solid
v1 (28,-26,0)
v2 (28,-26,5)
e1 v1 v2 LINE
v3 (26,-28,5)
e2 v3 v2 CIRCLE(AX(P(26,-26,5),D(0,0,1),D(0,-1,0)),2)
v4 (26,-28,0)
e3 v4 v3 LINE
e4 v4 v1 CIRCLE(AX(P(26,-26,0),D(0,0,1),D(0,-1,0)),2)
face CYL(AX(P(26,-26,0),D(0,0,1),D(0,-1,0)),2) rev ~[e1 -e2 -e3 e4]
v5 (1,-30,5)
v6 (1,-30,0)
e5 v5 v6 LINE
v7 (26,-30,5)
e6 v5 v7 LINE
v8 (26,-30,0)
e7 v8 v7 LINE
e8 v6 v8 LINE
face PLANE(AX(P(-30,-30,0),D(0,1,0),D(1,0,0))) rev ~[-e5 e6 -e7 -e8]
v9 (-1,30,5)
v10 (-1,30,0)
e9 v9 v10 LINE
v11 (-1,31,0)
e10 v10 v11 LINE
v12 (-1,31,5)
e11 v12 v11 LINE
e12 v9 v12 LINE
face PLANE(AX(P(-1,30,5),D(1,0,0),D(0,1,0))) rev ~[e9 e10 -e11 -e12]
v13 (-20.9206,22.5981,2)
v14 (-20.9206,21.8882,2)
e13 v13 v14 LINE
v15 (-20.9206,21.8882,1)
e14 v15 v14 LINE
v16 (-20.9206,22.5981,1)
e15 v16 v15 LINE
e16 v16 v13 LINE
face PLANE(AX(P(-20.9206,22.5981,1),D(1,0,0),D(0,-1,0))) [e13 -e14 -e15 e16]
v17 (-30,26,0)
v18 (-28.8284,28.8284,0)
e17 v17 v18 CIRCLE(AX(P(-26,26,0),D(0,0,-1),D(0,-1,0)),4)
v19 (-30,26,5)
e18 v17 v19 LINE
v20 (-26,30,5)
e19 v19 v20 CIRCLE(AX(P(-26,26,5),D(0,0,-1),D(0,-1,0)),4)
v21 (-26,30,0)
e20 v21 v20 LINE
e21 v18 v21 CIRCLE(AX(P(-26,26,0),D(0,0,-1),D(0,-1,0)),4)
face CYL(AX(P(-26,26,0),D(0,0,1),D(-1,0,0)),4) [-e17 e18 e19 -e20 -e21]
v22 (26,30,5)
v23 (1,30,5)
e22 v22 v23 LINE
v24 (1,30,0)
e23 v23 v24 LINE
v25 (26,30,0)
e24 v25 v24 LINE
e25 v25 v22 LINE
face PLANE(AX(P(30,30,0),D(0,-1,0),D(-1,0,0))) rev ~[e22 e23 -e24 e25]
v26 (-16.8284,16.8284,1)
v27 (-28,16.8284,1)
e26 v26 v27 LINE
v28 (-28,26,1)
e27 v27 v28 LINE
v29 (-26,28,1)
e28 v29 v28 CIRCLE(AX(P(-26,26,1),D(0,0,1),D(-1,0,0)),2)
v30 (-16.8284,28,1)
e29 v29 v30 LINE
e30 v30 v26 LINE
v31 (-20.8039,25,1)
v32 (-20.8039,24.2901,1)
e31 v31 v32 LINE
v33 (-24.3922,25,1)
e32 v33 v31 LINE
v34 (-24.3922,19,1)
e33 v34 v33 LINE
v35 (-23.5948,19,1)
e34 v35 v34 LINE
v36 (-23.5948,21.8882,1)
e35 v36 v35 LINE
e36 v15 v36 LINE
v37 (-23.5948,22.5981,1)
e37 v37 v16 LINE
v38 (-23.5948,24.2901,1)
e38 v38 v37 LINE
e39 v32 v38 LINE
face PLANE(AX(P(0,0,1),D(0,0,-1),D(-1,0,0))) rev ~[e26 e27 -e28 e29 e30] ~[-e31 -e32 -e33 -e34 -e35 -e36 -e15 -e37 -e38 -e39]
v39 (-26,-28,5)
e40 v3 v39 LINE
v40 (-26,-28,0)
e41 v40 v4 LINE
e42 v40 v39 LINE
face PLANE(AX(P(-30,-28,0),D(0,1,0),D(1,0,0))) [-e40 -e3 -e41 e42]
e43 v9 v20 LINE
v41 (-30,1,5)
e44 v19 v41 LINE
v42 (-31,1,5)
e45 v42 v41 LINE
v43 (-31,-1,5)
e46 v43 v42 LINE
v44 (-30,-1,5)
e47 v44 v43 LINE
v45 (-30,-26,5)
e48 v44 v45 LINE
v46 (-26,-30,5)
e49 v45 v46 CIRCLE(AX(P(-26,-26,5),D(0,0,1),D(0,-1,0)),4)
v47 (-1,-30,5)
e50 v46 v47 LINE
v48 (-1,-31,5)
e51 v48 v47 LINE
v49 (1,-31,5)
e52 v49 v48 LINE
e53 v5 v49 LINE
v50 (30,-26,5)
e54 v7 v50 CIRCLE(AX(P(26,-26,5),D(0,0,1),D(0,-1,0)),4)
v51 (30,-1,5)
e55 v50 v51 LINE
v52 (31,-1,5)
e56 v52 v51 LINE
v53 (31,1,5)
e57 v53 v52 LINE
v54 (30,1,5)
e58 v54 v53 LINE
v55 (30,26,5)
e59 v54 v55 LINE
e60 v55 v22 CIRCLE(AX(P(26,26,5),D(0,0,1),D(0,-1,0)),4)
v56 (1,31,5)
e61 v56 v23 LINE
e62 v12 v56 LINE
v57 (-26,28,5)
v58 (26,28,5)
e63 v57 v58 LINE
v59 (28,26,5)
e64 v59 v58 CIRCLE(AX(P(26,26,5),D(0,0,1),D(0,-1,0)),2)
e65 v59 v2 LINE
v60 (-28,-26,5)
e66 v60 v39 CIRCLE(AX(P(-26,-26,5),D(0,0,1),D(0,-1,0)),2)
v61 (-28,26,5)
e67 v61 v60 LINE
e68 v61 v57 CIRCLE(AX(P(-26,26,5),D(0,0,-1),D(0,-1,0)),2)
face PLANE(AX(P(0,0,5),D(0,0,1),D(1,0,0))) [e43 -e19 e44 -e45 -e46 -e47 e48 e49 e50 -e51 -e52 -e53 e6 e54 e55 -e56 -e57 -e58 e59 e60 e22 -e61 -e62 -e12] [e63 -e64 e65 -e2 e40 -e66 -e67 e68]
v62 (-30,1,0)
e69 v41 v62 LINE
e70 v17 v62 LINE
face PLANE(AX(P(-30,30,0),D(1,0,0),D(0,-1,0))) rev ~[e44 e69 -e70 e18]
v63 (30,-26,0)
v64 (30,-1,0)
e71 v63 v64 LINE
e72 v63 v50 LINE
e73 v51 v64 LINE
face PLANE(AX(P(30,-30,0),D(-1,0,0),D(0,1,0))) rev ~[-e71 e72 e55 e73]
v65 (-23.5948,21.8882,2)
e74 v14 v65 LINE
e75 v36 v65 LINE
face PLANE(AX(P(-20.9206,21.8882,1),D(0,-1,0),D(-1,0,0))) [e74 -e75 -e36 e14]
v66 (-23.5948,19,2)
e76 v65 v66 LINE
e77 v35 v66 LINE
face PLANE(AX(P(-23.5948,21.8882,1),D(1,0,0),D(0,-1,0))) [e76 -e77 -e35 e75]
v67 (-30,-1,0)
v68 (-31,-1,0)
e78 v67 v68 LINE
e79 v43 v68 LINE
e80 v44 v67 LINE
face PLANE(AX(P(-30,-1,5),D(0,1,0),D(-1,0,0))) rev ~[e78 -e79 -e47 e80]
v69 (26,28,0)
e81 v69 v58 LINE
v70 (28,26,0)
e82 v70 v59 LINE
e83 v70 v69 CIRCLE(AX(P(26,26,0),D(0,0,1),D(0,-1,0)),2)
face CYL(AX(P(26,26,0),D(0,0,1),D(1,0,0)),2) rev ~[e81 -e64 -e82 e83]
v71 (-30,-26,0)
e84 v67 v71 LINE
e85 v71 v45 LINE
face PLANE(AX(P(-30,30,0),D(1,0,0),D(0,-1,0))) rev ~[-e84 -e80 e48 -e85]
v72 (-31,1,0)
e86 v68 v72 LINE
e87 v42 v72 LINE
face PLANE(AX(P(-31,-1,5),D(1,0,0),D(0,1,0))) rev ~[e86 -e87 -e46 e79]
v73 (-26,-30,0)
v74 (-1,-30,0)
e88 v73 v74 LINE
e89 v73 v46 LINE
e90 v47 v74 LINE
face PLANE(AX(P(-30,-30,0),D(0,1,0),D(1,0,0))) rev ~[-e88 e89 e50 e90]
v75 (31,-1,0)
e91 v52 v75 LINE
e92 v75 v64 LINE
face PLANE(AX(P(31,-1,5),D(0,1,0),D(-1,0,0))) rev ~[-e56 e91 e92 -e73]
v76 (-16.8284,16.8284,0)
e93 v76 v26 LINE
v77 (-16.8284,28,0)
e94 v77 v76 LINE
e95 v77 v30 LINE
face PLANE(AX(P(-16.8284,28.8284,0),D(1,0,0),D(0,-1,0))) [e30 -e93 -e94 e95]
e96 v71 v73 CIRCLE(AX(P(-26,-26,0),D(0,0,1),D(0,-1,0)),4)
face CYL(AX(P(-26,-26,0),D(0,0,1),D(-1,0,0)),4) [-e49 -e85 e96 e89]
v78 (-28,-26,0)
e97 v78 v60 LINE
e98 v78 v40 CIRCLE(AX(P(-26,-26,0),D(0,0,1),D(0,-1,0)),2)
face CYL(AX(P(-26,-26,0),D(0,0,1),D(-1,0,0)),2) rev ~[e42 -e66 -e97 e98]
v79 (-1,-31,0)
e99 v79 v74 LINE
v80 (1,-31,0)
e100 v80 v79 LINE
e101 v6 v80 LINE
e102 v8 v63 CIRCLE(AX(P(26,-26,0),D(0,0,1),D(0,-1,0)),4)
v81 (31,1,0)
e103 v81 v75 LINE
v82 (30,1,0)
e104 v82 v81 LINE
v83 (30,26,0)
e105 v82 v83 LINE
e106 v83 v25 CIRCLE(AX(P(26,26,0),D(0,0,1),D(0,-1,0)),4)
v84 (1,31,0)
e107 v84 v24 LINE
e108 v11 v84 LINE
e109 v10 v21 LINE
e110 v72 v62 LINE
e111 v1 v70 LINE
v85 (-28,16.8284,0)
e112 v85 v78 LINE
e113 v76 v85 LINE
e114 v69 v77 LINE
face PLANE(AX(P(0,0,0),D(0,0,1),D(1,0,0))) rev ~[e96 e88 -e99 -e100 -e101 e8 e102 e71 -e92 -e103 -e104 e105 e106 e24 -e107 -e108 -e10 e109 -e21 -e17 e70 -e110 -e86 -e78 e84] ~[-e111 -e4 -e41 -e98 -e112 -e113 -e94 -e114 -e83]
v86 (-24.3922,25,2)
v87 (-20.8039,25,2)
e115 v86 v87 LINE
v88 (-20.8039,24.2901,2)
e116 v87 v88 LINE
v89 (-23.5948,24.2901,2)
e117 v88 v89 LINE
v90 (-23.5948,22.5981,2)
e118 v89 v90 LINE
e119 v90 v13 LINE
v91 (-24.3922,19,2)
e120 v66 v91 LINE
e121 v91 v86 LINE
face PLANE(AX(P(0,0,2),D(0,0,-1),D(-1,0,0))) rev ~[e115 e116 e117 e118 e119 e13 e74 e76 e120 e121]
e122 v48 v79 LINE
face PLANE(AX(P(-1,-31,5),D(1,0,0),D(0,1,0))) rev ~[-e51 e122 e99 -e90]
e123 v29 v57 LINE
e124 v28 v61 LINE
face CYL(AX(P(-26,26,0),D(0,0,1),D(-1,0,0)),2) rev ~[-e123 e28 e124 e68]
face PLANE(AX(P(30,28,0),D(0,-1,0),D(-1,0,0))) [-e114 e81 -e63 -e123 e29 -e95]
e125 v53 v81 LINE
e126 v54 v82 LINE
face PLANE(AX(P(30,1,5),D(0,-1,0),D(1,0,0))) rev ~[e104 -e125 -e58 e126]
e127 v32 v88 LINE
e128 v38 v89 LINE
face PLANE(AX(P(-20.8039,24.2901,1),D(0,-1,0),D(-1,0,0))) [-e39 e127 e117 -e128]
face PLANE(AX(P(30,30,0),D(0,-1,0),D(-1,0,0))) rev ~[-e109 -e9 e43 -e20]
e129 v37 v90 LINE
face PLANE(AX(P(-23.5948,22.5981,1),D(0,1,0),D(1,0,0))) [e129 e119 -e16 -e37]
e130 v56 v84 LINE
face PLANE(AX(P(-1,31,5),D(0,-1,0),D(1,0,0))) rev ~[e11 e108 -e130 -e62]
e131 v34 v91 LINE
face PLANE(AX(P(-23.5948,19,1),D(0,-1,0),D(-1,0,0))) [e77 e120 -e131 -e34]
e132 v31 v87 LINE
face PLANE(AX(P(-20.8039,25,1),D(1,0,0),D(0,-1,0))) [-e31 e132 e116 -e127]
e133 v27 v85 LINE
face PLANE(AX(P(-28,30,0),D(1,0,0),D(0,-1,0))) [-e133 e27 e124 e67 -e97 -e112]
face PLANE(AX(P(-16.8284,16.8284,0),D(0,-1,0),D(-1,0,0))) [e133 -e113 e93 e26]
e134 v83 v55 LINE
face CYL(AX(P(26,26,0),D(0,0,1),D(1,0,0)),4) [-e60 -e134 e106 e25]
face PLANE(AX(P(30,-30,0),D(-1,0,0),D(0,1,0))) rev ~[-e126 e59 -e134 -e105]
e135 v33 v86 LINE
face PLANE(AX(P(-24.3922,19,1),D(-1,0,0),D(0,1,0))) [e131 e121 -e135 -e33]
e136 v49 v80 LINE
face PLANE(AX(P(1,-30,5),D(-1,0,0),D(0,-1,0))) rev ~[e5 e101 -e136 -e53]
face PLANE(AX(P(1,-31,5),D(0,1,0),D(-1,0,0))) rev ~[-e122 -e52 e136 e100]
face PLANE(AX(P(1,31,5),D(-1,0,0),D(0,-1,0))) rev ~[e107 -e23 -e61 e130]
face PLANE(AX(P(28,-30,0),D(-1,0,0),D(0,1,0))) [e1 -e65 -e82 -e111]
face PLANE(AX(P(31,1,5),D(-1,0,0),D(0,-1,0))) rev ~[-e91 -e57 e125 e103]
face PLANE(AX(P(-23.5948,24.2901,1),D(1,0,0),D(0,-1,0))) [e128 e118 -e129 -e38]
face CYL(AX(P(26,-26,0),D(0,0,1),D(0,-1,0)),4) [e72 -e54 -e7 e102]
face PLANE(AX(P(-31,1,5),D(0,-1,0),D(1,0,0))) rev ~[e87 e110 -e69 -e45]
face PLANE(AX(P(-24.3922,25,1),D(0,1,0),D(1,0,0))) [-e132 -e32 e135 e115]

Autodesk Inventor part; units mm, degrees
ref_plane "YZ Plane" through (0, 0, 0) normal (1, 0, 0) x (0, 1, 0)
ref_plane "XZ Plane" through (0, 0, 0) normal (0, 1, 0) x (-1, 0, 0)
ref_plane "XY Plane" through (0, 0, 0) normal (0, 0, 1) x (1, 0, 0)
sketch "Sketch1" plane through (0, 0, 0) normal (0, 0, 1) x (1, 0, 0)
  line L0 (-30, -30) -> (30, -30)
  line L1 (30, -30) -> (30, 30)
  line L2 (30, 30) -> (-30, 30)
  line L3 (-30, 30) -> (-30, -30)
  point P0 (0, 0)
  point P1 (-30, 0)
  point P2 (0, 30)
  dimension "d0" = 60
extrude "Extrusion1" add sketch "Sketch1" along normal blind 5
sketch "Sketch2" plane through (0, 0, 5) normal (0, 0, 1) x (1, 0, 0)
  line L0 (30, -30) -> (30, 30) projected
  line L1 (30, 1) -> (31, 1)
  line L2 (31, 1) -> (31, -1)
  line L3 (31, -1) -> (30, -1)
  line L4 (30, -1) -> (30, 1)
  point P0 (0, 0)
  point P1 (30, 0)
  point P2 (31, 0)
  dimension "d3" = 2
  dimension "d4" = 1
extrude "Extrusion2" add sketch "Sketch2" against normal up to surface (5 mm away)
pattern_circular "Circular Pattern1" count 4 over 360 about axis through (0, 0, -10) along (0, 0, 1) of "Extrusion2"
fillet "Fillet1" radius 4 4 edges at (30, -30, 2.5) (30, 30, 2.5) (-30, 30, 2.5) (-30, -30, 2.5)
shell "Shell1" thickness 2 removed faces 2 at (-0.3333, -9.3333, 5) at (-0.3333, -9.3333, 0)
sketch "Sketch3" plane through (0, 0, 0) normal (0, 0, -1) x (-1, 0, 0)
  arc A0 (30, 26) -> (26, 30) centre (26, 26) ccw projected
  line L0 (28.8284, 28.8284) -> (16.8284, 28.8284)
  line L1 (16.8284, 28.8284) -> (16.8284, 16.8284)
  line L2 (16.8284, 16.8284) -> (28.8284, 16.8284)
  line L3 (28.8284, 16.8284) -> (28.8284, 28.8284)
  point P0 (0, 0)
  dimension "d12" = 12
extrude "Extrusion3" add sketch "Sketch3" against normal blind 1
sketch "Sketch4" plane through (0, 0, 1) normal (0, 0, 1) x (1, 0, 0)
  arc A0 (-26, 28) -> (-28, 26) centre (-26, 26) ccw projected
  line L0 (-25, 25) -> (-22.4899, 25) construction
  line L1 (-22.4899, 25) -> (-22.4899, 17.9124) construction
  line L2 (-22.4899, 17.9124) -> (-25, 17.9124) construction
  line L3 (-25, 17.9124) -> (-25, 25) construction
  line L4 (-20.8039, 24.2901) -> (-23.5948, 24.2901)
  line L5 (-23.5948, 24.2901) -> (-23.5948, 22.5981)
  line L6 (-23.5948, 22.5981) -> (-20.9206, 22.5981)
  line L7 (-20.9206, 22.5981) -> (-20.9206, 21.8882)
  line L8 (-20.9206, 21.8882) -> (-23.5948, 21.8882)
  line L9 (-23.5948, 21.8882) -> (-23.5948, 19)
  line L10 (-23.5948, 19) -> (-24.3922, 19)
  line L11 (-24.3922, 19) -> (-24.3922, 25)
  line L12 (-24.3922, 25) -> (-20.8039, 25)
  line L13 (-20.8039, 25) -> (-20.8039, 24.2901)
  point P0 (0, 0)
  dimension "d15" = 1
  dimension "d16" = 1
emboss "Emboss1" sketch "Sketch4" operation add depth 1 direction (0, 0, -1)
properties part number "Jerk Store Test"
